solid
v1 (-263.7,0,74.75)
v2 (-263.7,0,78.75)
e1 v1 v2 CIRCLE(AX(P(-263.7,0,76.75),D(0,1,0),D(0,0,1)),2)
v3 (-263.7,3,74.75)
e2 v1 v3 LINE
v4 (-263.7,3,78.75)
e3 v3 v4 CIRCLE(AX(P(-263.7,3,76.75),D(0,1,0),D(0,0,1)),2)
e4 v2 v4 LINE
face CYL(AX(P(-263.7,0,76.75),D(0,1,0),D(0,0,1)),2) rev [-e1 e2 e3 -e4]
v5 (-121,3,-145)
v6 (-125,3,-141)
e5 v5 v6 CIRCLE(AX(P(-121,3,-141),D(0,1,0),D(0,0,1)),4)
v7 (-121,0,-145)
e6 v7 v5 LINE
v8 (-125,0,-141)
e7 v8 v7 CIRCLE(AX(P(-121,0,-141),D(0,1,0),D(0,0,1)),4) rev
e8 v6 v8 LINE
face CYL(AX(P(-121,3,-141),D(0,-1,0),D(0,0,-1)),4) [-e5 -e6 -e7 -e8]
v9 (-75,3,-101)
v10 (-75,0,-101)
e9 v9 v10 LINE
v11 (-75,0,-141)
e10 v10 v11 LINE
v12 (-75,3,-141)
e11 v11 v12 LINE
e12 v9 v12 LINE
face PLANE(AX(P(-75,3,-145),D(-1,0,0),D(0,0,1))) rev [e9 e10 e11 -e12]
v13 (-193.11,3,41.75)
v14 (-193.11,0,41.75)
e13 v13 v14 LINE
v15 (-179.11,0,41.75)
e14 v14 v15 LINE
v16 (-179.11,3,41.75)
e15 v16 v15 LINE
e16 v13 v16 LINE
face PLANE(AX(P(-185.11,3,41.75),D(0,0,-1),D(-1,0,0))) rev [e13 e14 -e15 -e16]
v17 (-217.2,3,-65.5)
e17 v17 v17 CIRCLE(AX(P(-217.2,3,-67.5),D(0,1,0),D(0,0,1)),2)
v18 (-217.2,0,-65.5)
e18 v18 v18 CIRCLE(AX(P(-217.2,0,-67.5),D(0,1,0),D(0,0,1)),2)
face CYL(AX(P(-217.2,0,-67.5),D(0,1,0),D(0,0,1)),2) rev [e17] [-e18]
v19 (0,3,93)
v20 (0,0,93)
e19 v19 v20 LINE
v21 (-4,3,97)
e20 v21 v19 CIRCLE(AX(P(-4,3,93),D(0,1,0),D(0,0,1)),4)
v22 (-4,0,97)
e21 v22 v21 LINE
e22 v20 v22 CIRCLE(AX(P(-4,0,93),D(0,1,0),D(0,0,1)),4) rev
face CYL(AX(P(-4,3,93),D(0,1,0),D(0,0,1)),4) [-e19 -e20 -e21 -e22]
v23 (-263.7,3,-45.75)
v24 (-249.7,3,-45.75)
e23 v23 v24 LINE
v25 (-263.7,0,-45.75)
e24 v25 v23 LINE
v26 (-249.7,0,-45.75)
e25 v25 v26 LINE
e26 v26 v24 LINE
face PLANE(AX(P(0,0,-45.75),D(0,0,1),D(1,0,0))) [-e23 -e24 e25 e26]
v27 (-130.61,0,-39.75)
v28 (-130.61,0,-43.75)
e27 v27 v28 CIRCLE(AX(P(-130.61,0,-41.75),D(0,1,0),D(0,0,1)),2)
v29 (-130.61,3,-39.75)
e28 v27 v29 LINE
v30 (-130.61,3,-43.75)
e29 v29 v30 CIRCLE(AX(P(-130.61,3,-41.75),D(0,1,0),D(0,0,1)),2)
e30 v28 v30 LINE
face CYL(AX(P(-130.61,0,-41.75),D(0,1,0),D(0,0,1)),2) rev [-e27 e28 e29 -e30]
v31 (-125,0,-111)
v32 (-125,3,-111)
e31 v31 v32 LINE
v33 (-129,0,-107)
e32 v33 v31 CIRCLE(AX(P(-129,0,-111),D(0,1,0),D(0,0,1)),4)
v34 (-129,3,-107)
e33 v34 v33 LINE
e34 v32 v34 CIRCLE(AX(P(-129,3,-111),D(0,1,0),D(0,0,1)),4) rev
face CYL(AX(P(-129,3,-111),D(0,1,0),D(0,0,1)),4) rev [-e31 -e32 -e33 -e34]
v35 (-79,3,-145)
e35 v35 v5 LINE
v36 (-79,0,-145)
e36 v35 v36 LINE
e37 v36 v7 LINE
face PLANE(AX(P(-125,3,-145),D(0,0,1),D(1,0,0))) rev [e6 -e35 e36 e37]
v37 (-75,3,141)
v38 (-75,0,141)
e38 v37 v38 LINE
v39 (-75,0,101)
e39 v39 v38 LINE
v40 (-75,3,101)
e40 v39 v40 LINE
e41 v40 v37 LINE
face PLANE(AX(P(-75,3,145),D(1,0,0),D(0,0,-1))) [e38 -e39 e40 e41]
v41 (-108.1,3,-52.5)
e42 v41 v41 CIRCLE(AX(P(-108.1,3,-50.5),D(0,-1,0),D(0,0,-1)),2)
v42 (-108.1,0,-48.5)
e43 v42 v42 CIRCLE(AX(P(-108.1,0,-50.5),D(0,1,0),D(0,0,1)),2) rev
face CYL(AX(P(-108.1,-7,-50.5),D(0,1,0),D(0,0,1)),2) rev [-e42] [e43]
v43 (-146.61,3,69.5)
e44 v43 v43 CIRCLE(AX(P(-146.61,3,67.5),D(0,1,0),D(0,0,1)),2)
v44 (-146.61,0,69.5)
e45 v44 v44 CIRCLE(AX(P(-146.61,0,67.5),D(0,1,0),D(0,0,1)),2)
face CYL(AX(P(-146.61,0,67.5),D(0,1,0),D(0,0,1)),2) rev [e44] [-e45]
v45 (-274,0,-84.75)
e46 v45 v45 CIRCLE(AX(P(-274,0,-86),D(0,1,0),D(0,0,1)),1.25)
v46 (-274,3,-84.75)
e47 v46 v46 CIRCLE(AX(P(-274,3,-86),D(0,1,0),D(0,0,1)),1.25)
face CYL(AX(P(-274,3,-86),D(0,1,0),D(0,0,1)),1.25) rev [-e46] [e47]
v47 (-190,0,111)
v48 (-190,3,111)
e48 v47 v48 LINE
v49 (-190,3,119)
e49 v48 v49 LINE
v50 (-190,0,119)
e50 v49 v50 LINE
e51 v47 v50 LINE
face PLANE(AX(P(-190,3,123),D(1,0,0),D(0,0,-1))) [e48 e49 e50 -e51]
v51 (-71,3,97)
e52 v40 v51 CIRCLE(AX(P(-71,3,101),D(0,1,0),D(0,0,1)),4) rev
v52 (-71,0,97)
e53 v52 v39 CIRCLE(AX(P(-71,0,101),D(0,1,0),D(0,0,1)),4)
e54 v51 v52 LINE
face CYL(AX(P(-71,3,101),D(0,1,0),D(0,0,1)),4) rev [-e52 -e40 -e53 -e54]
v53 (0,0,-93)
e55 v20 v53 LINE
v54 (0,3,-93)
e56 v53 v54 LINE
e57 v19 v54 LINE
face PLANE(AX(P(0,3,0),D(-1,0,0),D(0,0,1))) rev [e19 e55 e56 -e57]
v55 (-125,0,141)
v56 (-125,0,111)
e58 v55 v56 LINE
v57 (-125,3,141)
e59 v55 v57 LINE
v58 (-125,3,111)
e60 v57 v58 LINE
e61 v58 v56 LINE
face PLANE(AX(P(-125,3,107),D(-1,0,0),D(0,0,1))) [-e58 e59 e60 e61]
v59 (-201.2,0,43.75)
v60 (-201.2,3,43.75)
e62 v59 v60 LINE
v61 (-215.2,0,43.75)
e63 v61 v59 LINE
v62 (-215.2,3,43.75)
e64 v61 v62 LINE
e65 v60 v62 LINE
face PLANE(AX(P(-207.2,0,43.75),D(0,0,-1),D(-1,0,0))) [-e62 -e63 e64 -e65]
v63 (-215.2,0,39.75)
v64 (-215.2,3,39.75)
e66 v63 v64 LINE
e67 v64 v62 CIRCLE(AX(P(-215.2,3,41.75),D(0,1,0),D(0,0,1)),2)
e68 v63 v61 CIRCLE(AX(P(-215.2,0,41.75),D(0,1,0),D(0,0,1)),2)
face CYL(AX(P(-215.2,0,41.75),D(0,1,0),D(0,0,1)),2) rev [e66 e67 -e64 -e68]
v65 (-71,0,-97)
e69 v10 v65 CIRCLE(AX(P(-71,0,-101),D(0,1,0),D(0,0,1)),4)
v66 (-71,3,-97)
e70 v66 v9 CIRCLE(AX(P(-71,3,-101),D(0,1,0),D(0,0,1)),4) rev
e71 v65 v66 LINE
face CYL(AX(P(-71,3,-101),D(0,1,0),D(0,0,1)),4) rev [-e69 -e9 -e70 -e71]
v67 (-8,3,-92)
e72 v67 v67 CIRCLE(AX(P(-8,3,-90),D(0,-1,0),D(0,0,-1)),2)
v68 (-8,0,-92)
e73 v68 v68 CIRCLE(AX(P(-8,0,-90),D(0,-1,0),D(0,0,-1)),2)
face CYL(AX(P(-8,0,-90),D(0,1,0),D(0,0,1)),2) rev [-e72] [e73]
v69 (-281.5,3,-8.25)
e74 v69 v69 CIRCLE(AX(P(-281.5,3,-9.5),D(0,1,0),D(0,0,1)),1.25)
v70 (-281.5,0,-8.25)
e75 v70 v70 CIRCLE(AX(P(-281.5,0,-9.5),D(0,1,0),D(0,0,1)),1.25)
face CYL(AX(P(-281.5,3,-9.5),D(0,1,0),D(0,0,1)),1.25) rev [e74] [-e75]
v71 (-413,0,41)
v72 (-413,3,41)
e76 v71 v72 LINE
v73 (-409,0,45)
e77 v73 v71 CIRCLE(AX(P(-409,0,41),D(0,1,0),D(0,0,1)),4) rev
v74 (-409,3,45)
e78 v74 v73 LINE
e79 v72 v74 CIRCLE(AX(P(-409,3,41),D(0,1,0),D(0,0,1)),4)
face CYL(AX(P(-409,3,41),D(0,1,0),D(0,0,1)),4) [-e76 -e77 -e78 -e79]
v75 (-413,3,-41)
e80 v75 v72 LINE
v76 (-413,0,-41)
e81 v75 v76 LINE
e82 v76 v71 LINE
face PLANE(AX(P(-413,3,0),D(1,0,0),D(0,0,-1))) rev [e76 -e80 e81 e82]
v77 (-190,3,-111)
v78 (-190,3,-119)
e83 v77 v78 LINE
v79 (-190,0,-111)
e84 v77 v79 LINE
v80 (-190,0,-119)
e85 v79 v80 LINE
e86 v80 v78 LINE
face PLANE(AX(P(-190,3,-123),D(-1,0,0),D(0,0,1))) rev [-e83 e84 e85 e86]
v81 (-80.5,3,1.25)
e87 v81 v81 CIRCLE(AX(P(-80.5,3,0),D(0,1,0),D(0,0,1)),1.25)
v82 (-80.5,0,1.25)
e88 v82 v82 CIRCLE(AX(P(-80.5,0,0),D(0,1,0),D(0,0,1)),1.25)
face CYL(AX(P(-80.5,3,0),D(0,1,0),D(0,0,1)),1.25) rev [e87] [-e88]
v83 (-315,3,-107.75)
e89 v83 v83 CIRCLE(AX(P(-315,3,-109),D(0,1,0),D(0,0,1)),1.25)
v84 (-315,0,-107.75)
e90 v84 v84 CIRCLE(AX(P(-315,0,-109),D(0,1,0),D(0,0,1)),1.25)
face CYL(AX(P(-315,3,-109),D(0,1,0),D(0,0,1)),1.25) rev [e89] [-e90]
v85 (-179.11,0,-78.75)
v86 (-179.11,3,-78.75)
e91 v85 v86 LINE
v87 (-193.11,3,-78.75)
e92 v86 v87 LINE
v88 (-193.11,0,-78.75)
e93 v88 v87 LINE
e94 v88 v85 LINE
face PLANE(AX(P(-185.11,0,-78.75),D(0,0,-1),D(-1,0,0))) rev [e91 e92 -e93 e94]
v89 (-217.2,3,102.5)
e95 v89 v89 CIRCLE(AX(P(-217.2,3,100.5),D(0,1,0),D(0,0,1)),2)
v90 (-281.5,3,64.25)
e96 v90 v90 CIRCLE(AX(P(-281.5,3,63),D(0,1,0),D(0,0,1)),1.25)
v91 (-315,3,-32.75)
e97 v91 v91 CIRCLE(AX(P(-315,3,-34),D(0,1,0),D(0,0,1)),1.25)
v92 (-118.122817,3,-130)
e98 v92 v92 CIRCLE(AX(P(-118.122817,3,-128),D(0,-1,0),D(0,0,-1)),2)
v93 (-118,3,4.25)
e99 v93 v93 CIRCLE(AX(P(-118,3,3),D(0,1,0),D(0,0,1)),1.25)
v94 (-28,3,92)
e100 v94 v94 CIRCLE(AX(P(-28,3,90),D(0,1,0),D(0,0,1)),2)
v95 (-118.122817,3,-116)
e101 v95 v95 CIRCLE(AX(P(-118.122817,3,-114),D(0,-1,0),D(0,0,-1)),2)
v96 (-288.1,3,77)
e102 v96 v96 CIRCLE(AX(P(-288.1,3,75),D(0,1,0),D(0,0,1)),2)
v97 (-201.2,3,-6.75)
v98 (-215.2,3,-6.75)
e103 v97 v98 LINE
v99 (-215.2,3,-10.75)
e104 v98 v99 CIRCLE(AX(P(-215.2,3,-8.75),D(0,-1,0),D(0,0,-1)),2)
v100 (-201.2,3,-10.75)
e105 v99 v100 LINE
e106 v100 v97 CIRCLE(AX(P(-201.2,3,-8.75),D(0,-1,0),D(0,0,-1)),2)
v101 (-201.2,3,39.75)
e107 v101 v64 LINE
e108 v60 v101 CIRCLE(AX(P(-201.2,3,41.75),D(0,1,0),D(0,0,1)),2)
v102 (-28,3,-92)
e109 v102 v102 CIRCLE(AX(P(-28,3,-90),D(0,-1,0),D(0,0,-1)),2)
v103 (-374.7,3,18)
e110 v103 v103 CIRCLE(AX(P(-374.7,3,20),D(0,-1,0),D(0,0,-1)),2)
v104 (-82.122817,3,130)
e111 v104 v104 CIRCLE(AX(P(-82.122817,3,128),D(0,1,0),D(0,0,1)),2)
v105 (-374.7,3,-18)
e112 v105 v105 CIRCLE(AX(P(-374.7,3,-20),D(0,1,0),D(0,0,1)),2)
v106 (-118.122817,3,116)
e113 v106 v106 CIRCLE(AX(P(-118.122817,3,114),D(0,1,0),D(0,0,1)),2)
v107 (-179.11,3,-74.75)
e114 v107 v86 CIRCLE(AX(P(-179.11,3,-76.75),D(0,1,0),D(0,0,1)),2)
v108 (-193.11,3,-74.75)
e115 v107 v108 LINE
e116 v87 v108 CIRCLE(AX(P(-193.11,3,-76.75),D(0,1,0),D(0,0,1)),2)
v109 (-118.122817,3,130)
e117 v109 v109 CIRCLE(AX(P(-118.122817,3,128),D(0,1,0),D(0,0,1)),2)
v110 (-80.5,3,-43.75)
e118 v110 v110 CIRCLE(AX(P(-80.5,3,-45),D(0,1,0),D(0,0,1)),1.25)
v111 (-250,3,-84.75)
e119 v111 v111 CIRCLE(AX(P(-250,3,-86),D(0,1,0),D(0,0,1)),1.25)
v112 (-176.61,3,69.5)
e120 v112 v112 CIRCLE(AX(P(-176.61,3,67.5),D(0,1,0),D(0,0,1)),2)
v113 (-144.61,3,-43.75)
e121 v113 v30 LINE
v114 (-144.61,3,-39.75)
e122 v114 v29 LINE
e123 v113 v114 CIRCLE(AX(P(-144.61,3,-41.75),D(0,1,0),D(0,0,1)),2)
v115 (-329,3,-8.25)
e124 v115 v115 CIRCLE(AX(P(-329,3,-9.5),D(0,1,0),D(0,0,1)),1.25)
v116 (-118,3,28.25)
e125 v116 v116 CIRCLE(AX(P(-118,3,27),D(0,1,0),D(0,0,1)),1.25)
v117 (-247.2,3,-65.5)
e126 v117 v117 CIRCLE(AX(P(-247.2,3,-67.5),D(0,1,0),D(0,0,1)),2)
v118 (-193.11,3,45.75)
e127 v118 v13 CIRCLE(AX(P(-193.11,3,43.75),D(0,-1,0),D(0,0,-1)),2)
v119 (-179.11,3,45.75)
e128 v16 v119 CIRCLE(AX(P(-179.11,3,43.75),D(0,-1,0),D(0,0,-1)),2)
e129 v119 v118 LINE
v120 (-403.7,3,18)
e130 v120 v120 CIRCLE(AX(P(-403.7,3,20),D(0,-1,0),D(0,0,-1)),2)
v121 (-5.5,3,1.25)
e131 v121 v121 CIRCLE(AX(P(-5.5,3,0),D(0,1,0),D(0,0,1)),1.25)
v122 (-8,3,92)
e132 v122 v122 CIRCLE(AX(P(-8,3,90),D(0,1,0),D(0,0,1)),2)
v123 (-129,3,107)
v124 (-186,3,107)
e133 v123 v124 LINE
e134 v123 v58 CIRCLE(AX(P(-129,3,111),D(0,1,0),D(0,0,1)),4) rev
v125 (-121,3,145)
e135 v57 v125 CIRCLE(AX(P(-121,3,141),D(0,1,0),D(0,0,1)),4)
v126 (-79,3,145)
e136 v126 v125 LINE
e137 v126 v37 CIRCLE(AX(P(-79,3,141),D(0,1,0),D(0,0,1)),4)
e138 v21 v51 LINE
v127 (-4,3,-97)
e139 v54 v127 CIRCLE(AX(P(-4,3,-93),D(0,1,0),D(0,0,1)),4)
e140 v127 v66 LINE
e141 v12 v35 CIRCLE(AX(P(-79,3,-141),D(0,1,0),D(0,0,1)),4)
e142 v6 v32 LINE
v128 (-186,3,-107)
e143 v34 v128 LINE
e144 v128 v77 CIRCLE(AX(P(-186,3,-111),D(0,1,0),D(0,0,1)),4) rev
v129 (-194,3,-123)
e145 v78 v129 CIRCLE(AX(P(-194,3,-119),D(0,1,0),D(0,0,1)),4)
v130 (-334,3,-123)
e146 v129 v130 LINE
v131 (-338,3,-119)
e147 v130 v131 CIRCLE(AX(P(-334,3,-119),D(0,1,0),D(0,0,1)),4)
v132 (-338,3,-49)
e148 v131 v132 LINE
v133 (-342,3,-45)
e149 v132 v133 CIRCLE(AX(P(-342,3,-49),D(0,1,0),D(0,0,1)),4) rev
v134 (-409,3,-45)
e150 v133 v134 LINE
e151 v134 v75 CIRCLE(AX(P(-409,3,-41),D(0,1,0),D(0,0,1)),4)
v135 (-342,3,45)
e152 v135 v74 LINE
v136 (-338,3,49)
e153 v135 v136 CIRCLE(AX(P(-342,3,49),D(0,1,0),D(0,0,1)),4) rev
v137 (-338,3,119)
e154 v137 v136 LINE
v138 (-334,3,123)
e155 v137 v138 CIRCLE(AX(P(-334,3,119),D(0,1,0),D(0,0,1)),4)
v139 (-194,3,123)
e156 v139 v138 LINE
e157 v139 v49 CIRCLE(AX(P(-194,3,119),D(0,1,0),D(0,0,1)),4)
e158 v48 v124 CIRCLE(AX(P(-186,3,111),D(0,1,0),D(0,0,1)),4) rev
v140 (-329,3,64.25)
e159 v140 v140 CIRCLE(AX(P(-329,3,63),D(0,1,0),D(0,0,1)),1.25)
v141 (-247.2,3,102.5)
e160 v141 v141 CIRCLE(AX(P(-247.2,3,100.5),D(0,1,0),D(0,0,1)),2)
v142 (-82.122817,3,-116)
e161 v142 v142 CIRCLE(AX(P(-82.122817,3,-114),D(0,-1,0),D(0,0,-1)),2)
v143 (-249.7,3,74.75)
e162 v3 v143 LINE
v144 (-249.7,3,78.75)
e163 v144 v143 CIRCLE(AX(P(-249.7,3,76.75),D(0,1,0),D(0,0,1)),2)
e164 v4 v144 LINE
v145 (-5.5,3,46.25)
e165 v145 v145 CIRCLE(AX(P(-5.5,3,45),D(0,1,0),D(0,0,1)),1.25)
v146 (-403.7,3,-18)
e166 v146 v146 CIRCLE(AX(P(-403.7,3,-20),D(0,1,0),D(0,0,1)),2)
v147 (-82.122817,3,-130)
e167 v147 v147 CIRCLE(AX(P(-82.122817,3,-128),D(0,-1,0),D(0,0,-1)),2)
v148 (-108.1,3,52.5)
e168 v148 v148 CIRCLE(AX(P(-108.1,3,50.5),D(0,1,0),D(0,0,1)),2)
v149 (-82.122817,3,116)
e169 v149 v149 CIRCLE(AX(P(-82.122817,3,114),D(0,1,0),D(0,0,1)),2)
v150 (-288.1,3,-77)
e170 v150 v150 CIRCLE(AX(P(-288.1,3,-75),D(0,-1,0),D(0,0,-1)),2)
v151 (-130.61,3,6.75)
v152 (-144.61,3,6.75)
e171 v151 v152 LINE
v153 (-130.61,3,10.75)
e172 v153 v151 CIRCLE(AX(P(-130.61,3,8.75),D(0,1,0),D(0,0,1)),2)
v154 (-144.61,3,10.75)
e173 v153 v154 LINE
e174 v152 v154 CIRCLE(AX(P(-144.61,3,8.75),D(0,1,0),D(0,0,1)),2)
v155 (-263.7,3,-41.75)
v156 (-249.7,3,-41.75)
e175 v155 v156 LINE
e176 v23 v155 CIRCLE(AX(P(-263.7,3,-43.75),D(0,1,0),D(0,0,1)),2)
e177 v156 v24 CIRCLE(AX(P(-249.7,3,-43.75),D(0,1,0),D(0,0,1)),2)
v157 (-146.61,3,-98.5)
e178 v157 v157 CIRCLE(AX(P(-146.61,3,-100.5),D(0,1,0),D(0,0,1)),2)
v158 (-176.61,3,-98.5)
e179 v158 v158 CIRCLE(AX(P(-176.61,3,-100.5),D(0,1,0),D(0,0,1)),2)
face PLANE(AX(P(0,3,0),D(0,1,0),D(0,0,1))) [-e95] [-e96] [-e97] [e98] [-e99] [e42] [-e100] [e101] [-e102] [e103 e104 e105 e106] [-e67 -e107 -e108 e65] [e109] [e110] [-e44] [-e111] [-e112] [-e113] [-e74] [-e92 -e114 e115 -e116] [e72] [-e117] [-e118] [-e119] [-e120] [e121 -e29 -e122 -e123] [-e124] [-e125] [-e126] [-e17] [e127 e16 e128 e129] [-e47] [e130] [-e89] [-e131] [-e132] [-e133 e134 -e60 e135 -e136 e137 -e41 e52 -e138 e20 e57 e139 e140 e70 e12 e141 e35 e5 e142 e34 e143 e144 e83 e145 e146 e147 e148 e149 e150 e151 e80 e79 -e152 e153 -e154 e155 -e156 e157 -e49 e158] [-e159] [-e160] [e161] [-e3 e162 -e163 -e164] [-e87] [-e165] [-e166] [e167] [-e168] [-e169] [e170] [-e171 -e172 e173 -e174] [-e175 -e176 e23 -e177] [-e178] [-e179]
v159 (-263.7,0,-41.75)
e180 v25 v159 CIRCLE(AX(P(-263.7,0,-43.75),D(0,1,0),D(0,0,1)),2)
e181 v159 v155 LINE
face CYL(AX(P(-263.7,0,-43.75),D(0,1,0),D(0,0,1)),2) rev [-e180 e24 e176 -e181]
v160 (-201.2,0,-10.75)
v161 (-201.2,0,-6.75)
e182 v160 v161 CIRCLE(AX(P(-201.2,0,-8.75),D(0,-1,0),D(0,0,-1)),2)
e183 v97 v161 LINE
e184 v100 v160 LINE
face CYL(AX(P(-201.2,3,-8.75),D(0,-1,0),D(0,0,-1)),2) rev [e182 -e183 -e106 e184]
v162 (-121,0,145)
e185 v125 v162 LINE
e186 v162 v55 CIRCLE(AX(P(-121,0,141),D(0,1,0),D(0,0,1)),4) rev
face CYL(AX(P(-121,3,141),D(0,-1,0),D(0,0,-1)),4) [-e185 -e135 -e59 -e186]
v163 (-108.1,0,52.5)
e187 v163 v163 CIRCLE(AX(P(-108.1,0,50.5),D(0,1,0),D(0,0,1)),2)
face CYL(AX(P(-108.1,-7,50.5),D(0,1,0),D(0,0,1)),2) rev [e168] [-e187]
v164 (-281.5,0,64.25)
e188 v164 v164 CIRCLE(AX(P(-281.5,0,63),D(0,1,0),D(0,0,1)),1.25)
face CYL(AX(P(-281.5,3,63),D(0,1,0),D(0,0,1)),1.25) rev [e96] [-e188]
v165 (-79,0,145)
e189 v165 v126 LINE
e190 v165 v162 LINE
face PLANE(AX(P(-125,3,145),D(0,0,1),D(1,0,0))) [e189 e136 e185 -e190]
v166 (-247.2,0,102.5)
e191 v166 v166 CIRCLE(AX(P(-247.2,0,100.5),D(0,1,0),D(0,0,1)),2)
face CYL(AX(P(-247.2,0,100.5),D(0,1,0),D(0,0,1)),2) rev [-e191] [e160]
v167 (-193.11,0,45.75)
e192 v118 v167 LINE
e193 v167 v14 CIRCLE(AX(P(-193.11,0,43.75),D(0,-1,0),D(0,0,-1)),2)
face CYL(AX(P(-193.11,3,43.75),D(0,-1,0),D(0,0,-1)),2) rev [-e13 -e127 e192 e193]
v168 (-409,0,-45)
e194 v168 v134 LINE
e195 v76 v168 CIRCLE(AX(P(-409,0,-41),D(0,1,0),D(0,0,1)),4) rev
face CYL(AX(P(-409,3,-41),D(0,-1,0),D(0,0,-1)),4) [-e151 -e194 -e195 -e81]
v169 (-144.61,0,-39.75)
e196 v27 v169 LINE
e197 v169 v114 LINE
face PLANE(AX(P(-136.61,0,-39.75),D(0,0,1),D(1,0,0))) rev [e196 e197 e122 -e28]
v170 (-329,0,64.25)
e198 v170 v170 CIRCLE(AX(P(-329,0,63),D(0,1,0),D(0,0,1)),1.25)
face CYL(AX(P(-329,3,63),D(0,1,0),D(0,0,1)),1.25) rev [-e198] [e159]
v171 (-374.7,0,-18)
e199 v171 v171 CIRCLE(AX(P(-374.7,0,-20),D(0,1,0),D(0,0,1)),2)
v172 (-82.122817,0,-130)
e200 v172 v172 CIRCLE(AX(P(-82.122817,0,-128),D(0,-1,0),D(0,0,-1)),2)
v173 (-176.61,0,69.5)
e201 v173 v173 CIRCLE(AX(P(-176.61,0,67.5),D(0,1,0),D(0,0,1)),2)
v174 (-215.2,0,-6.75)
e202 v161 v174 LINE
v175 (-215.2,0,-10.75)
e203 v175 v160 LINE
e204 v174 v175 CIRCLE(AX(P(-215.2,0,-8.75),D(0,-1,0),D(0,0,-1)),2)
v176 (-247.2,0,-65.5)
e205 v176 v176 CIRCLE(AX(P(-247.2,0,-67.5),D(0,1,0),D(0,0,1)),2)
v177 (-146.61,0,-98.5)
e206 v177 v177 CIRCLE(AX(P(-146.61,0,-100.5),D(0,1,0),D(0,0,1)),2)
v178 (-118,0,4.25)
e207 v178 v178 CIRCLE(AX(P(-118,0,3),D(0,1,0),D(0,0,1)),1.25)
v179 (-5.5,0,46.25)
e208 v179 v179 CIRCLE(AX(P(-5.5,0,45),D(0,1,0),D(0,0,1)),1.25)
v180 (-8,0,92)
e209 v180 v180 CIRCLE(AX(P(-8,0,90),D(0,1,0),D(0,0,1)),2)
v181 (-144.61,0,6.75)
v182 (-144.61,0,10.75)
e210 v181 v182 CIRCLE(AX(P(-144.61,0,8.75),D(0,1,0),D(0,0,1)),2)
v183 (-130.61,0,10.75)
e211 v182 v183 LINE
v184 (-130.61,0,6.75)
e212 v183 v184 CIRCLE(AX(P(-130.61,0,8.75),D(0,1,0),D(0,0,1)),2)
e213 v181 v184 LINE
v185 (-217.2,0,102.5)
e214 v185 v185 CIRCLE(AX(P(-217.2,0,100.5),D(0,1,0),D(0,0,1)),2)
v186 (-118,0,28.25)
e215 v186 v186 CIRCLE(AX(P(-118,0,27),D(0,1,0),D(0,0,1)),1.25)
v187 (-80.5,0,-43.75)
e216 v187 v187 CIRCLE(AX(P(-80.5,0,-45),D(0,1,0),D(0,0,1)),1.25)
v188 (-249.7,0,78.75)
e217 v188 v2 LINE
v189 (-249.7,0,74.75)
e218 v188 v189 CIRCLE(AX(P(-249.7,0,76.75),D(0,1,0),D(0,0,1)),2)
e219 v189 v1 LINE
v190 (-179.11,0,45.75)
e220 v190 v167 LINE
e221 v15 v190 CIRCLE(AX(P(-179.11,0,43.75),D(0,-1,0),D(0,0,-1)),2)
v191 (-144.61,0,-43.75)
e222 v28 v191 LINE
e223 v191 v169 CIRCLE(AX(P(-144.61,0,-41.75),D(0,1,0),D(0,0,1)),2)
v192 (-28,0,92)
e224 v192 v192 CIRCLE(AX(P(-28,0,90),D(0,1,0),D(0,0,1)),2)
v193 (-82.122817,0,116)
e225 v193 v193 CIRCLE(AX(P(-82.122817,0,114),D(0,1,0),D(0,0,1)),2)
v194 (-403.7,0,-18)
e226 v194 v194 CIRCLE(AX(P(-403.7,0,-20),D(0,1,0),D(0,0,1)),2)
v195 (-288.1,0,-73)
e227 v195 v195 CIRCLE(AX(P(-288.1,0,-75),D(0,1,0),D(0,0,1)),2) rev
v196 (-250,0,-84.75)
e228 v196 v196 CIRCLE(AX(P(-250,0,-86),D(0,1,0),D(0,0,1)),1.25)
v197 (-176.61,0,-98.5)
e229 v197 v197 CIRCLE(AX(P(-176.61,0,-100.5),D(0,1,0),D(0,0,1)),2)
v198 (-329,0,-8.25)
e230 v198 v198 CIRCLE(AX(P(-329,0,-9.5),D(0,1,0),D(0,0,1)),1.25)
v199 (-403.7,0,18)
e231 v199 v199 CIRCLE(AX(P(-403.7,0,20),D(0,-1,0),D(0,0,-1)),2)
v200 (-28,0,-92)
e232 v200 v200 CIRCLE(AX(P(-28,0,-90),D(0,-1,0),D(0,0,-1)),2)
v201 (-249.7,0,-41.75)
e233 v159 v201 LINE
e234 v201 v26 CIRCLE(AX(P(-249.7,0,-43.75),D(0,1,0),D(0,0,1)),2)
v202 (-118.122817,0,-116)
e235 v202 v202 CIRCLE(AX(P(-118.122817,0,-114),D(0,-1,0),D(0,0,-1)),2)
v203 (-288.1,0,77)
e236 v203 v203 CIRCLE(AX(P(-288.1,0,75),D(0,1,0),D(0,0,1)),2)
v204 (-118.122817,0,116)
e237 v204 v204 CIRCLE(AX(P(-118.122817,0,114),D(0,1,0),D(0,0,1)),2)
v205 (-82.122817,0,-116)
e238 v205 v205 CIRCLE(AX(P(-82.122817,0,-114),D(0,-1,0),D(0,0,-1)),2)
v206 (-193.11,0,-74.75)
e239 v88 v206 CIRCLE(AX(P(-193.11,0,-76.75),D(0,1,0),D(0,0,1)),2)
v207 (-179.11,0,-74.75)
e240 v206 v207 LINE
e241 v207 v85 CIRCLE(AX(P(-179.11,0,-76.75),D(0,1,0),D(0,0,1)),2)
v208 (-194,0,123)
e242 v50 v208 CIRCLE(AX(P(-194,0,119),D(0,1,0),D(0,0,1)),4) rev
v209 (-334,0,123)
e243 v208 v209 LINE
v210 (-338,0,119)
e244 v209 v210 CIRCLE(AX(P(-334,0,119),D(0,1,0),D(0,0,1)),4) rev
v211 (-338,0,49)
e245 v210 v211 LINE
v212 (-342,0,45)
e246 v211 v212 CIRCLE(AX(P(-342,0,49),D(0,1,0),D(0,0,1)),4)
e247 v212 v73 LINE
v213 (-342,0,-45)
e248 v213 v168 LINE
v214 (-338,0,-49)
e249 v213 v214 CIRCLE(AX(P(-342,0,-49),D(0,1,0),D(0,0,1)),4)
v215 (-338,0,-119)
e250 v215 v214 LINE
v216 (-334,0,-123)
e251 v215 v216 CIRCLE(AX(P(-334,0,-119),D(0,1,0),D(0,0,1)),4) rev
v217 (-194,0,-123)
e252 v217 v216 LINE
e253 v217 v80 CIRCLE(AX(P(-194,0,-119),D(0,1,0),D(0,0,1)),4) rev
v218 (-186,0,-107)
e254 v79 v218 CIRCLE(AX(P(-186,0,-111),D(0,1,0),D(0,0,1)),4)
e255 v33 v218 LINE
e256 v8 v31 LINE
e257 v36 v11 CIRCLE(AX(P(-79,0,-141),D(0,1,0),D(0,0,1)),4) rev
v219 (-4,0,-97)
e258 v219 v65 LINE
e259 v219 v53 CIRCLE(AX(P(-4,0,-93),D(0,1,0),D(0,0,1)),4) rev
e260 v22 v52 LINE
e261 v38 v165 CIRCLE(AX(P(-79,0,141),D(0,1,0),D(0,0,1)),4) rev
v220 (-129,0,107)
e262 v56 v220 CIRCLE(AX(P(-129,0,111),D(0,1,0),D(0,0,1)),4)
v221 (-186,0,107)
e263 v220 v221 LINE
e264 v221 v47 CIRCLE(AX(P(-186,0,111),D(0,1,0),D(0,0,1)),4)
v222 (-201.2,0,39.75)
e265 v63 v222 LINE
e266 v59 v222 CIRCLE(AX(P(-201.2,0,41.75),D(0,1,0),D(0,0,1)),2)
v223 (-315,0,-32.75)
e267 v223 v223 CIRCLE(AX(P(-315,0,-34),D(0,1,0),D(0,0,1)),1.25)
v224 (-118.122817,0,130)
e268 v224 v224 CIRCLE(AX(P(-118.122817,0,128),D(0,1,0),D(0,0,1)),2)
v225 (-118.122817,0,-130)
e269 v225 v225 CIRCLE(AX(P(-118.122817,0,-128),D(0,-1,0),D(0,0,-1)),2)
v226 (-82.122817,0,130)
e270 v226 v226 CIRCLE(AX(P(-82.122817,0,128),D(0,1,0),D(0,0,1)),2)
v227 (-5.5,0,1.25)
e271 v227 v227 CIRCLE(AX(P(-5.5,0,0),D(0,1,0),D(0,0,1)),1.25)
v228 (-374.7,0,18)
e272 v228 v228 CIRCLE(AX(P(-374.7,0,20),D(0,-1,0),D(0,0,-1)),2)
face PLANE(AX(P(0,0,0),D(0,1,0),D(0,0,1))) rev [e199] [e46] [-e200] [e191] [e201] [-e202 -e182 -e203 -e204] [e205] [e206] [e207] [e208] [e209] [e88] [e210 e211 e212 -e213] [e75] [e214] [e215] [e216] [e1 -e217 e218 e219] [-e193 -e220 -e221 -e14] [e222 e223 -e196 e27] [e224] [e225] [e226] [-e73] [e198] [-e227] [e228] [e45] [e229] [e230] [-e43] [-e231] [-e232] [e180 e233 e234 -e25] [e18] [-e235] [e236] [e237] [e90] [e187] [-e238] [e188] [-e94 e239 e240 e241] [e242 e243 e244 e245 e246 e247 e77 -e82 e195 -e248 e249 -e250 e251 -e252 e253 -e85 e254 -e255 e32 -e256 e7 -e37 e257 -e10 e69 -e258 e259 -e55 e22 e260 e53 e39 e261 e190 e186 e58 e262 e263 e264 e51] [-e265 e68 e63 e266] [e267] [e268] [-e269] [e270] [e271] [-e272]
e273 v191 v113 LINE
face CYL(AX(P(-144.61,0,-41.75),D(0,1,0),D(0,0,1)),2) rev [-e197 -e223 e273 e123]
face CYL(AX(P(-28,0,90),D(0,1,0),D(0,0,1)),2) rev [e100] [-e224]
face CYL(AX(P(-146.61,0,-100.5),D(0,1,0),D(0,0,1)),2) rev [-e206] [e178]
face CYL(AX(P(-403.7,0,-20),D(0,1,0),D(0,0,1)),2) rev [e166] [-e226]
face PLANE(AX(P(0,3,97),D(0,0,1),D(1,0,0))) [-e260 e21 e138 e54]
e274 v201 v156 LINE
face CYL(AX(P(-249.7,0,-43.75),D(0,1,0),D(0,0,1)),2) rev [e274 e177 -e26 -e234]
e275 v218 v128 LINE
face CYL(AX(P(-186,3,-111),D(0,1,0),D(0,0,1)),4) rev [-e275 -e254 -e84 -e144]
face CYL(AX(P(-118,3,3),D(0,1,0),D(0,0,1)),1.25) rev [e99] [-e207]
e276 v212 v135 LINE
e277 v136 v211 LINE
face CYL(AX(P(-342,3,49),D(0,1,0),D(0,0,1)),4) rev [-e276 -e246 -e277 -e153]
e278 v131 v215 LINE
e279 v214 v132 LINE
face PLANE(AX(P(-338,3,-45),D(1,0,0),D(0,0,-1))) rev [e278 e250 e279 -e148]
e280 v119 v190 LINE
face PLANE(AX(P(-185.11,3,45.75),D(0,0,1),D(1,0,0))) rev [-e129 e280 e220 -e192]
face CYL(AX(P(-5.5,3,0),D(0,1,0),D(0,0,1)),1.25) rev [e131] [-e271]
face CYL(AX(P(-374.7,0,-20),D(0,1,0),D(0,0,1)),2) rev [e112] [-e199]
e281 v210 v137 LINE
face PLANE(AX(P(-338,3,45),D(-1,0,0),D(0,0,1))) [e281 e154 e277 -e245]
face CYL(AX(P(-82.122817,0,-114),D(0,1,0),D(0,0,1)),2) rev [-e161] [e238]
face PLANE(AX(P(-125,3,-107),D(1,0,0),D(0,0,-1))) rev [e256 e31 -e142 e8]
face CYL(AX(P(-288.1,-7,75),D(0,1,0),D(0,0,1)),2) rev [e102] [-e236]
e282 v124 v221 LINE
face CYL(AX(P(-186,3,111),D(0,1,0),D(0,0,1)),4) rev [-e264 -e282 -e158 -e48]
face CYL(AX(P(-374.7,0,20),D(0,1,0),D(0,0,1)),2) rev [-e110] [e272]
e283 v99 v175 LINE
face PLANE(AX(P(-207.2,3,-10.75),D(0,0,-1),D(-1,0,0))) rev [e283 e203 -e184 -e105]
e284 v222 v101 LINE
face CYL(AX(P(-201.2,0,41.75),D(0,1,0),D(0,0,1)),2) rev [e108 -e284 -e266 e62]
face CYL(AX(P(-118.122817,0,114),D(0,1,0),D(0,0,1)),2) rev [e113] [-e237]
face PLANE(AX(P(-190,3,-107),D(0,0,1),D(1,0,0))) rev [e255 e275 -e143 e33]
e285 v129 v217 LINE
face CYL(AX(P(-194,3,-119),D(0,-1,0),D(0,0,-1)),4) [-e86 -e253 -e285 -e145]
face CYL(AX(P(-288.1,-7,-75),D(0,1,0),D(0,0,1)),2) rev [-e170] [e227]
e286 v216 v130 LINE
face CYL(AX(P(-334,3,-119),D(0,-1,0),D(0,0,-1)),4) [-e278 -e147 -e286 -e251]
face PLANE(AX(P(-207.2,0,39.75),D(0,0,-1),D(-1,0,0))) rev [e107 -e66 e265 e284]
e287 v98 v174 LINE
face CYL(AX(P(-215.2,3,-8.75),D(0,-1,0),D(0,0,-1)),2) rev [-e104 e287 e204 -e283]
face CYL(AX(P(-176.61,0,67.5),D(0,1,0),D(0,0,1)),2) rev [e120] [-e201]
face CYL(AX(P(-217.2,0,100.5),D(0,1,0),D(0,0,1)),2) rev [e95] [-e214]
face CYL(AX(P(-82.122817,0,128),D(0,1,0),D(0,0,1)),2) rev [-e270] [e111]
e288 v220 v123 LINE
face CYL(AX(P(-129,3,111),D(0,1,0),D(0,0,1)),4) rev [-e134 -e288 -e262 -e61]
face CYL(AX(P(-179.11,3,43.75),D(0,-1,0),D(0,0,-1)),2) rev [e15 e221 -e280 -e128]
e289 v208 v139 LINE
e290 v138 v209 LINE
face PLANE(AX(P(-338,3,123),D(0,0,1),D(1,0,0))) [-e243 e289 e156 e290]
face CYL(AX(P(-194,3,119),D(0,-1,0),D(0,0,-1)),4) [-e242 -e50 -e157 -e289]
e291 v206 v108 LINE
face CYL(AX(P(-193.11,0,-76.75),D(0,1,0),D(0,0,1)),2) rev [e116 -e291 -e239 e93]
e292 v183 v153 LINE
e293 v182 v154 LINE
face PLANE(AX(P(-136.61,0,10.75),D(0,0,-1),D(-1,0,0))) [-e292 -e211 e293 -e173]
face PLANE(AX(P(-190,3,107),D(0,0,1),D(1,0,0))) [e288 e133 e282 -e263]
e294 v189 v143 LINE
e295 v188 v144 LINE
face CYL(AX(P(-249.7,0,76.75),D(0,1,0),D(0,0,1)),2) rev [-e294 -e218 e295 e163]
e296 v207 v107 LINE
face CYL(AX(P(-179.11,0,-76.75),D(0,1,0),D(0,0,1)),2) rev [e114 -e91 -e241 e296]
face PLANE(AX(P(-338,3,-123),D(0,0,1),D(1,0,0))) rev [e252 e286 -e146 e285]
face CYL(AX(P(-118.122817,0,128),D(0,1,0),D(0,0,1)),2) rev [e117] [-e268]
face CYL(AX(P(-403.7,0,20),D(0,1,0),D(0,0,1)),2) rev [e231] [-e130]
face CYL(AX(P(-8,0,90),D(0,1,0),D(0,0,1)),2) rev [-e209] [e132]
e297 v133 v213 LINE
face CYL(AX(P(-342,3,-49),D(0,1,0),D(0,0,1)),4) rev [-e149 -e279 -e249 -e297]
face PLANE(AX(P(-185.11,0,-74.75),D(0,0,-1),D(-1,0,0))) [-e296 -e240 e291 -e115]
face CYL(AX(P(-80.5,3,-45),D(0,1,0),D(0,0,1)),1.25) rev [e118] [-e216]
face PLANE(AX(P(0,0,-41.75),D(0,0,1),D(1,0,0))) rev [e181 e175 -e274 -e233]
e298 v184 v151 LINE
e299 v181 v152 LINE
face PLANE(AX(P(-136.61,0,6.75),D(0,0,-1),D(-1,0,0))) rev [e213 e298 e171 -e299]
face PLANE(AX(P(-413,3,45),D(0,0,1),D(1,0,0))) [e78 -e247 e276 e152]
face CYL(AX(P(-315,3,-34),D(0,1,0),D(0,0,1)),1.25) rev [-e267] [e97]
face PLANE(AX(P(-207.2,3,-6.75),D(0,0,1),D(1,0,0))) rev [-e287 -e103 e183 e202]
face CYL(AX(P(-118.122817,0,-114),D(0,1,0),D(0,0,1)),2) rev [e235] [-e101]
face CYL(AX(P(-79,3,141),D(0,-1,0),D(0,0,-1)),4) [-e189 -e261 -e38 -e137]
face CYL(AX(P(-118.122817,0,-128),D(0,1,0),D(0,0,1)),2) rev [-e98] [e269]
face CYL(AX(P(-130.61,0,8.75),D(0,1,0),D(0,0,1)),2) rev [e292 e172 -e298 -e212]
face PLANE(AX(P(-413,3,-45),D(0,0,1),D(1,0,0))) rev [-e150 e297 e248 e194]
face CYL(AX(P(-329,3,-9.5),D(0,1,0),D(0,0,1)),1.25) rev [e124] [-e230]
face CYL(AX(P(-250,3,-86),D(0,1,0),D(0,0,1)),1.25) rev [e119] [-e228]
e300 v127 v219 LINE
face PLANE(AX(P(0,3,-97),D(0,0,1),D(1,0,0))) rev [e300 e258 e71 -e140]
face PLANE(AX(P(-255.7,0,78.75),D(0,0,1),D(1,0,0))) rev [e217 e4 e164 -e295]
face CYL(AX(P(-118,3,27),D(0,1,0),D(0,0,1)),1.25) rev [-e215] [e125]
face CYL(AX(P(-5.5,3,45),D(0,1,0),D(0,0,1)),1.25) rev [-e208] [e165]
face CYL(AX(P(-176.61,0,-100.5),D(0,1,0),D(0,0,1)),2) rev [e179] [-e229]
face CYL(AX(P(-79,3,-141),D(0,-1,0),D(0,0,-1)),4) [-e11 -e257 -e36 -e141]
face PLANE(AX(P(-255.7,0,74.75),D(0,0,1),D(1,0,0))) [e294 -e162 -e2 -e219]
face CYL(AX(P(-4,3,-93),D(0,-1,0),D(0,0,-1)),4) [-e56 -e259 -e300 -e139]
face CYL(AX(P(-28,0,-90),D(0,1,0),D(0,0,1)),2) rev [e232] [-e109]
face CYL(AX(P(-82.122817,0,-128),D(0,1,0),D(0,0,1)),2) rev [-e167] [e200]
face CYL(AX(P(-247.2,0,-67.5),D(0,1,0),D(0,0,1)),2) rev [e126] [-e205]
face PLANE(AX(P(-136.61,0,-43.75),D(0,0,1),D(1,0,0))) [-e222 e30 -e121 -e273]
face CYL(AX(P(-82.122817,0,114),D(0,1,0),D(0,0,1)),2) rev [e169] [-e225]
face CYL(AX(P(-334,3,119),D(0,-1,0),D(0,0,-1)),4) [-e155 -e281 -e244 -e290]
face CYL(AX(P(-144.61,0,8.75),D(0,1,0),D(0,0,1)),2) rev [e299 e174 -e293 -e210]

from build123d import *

# Parameters (mm, degrees)
SALIENTE_EXTRUIR1_DEPTH       = 3
REDONDEO1_R                   = 4
CROQUIS4_R                    = 2
CORTAR_EXTRUIR1_DEPTH         = 10
CROQUIS5_R                    = 2
CORTAR_EXTRUIR2_DEPTH         = 10
TALADRO_ROSCADO_M31_D         = 2.5
TALADRO_ROSCADO_M31_DEPTH     = 8.5
TALADRO_ROSCADO_M31_TIP       = 0.751075774
CROQUIS13_R                   = 2
CORTAR_EXTRUIR6_DEPTH         = 438.724799389
CROQUIS14_R                   = 2
CORTAR_EXTRUIR7_DEPTH         = 438.724799389
CORTAR_EXTRUIR9_DEPTH         = 438.724799389
TALADRO_ROSCADO_M32_D         = 2.5
TALADRO_ROSCADO_M32_DEPTH     = 8.5
TALADRO_ROSCADO_M32_TIP       = 0.751075774
TALADRO_ROSCADO_M33_OUTLINE_R = 1.25
TALADRO_ROSCADO_M33_DEPTH     = 3
CROQUIS22_R                   = 2
CORTAR_EXTRUIR10_DEPTH        = 438.724799389
CROQUIS23_R                   = 2
CORTAR_EXTRUIR11_DEPTH        = 438.724799389
TALADRO_ROSCADO_M34_OUTLINE_R = 1.25
TALADRO_ROSCADO_M34_DEPTH     = 3
CROQUIS26_R                   = 2
CORTAR_EXTRUIR12_DEPTH        = 438.724799389
TALADRO_ROSCADO_M35_OUTLINE_R = 1.25
TALADRO_ROSCADO_M35_DEPTH     = 3
CROQUIS31_R                   = 2
CORTAR_EXTRUIR13_DEPTH        = 438.724799389
CORTAR_EXTRUIR14_DEPTH        = 438.724799389


# Read off the part's stored shape, not the designer's step: Taladro roscado M33, Taladro roscado M34, Taladro roscado M35
with BuildPart() as part:
    # Croquis1 → Saliente-Extruir1 (new body)
    with BuildSketch(Plane(origin=(0, 0, 0), x_dir=(1, 0, 0), z_dir=(0, 1, 0))):
        Polygon((0, 0), (-413, 0), (-413, 45), (-338, 45), (-338, 123), (-190, 123), (-190, 107), (-125, 107), (-125, 145), (-75, 145), (-75, 97), (0, 97), align=None)
    saliente_extruir1 = extrude(amount=SALIENTE_EXTRUIR1_DEPTH)

    # Simetría1: Saliente-Extruir1 across plane
    add(saliente_extruir1.mirror(Plane(origin=(0, 3, 0), x_dir=(1, 0, 0), z_dir=(0, 0, -1))))

    # Redondeo1
    redondeo1_edges = [part.edges().sort_by_distance(p)[0] for p in [
        (-413, 1.5, -45),
        (-338, 1.5, -45),
        (-338, 1.5, -123),
        (-190, 1.5, -123),
        (-190, 1.5, -107),
        (-125, 1.5, -107),
        (-125, 1.5, -145),
        (-75, 1.5, -145),
        (-75, 1.5, -97),
        (0, 1.5, -97),
        (0, 1.5, 97),
        (-413, 1.5, 45),
        (-338, 1.5, 45),
        (-338, 1.5, 123),
        (-190, 1.5, 123),
        (-190, 1.5, 107),
        (-125, 1.5, 107),
        (-125, 1.5, 145),
        (-75, 1.5, 145),
        (-75, 1.5, 97),
    ]]
    fillet(redondeo1_edges, radius=REDONDEO1_R)

    # Croquis4 → Cortar-Extruir1 (cut)
    with BuildSketch(Plane(origin=(0, 3, 0), x_dir=(1, 0, 0), z_dir=(0, 1, 0))):
        with Locations(Location((-108.1, -50.5, 0), (0, 0, 270))):
            Circle(CROQUIS4_R)
    cortar_extruir1 = extrude(amount=-CORTAR_EXTRUIR1_DEPTH, mode=Mode.SUBTRACT)

    # Simetría2: Cortar-Extruir1 across plane
    add(cortar_extruir1.mirror(Plane.XY), mode=Mode.SUBTRACT)

    # Croquis5 → Cortar-Extruir2 (cut)
    with BuildSketch(Plane(origin=(0, 3, 0), x_dir=(1, 0, 0), z_dir=(0, 1, 0))):
        with Locations(Location((-288.1, -75, 0), (0, 0, 270))):
            Circle(CROQUIS5_R)
    cortar_extruir2 = extrude(amount=-CORTAR_EXTRUIR2_DEPTH, mode=Mode.SUBTRACT)

    # Simetría3: Cortar-Extruir2 across plane
    add(cortar_extruir2.mirror(Plane.XY), mode=Mode.SUBTRACT)

    # Taladro roscado M31
    with Locations(Plane(origin=(0, 3, 0), x_dir=(1, 0, 0), z_dir=(0, 1, 0))):
        with Locations((-329, 9.5), (-281.5, 9.5), (-281.5, -63), (-329, -63)):
            Hole(TALADRO_ROSCADO_M31_D / 2, depth=TALADRO_ROSCADO_M31_DEPTH)
            with Locations((0, 0, -(TALADRO_ROSCADO_M31_DEPTH + TALADRO_ROSCADO_M31_TIP / 2))):  # 118° drill point
                Cone(0, TALADRO_ROSCADO_M31_D / 2, TALADRO_ROSCADO_M31_TIP, mode=Mode.SUBTRACT)

    # Croquis13 → Cortar-Extruir6 (cut, through all)
    with BuildSketch(Plane(origin=(0, 3, 0), x_dir=(1, 0, 0), z_dir=(0, 1, 0))):
        with Locations(Location((-8, -90, 0), (0, 0, 270))):
            Circle(CROQUIS13_R)
    cortar_extruir6 = extrude(amount=-CORTAR_EXTRUIR6_DEPTH, mode=Mode.SUBTRACT)

    # Croquis14 → Cortar-Extruir7 (cut, through all)
    with BuildSketch(Plane(origin=(0, 3, 0), x_dir=(1, 0, 0), z_dir=(0, 1, 0))):
        with Locations(Location((-28, -90, 0), (0, 0, 270))):
            Circle(CROQUIS14_R)
    cortar_extruir7 = extrude(amount=-CORTAR_EXTRUIR7_DEPTH, mode=Mode.SUBTRACT)

    # Croquis16 → Cortar-Extruir9 (cut, through all)
    with BuildSketch(Plane(origin=(0, 3, 0), x_dir=(1, 0, 0), z_dir=(0, 1, 0))):
        with BuildLine():
            Line((-263.7, 41.75), (-249.7, 41.75))
            ThreePointArc((-249.7, 41.75), (-247.7, 43.75), (-249.7, 45.75))
            Line((-249.7, 45.75), (-263.7, 45.75))
            ThreePointArc((-263.7, 45.75), (-265.7, 43.75), (-263.7, 41.75))
        make_face()
        with BuildLine():
            Line((-263.7, -78.75), (-249.7, -78.75))
            ThreePointArc((-249.7, -78.75), (-247.7, -76.75), (-249.7, -74.75))
            Line((-249.7, -74.75), (-263.7, -74.75))
            ThreePointArc((-263.7, -74.75), (-265.7, -76.75), (-263.7, -78.75))
        make_face()
        with BuildLine():
            Line((-215.2, -43.75), (-201.2, -43.75))
            ThreePointArc((-201.2, -43.75), (-199.2, -41.75), (-201.2, -39.75))
            Line((-201.2, -39.75), (-215.2, -39.75))
            ThreePointArc((-215.2, -39.75), (-217.2, -41.75), (-215.2, -43.75))
        make_face()
        with BuildLine():
            Line((-144.61, -10.75), (-130.61, -10.75))
            ThreePointArc((-130.61, -10.75), (-128.61, -8.75), (-130.61, -6.75))
            Line((-130.61, -6.75), (-144.61, -6.75))
            ThreePointArc((-144.61, -6.75), (-146.61, -8.75), (-144.61, -10.75))
        make_face()
        with BuildLine():
            Line((-144.61, 39.75), (-130.61, 39.75))
            ThreePointArc((-130.61, 39.75), (-128.61, 41.75), (-130.61, 43.75))
            Line((-130.61, 43.75), (-144.61, 43.75))
            ThreePointArc((-144.61, 43.75), (-146.61, 41.75), (-144.61, 39.75))
        make_face()
        with BuildLine():
            Line((-193.11, 74.75), (-179.11, 74.75))
            ThreePointArc((-179.11, 74.75), (-177.11, 76.75), (-179.11, 78.75))
            Line((-179.11, 78.75), (-193.11, 78.75))
            ThreePointArc((-193.11, 78.75), (-195.11, 76.75), (-193.11, 74.75))
        make_face()
    extrude(amount=-CORTAR_EXTRUIR9_DEPTH, mode=Mode.SUBTRACT)

    # Taladro roscado M32
    with Locations(Plane(origin=(0, 3, 0), x_dir=(1, 0, 0), z_dir=(0, 1, 0))):
        with Locations((-315, 34), (-315, 109)):
            Hole(TALADRO_ROSCADO_M32_D / 2, depth=TALADRO_ROSCADO_M32_DEPTH)
            with Locations((0, 0, -(TALADRO_ROSCADO_M32_DEPTH + TALADRO_ROSCADO_M32_TIP / 2))):  # 118° drill point
                Cone(0, TALADRO_ROSCADO_M32_D / 2, TALADRO_ROSCADO_M32_TIP, mode=Mode.SUBTRACT)

    # Taladro roscado M33 outline → Taladro roscado M33 (cut)
    with BuildSketch(Plane(origin=(0, 0, 0), x_dir=(1, 0, 0), z_dir=(0, 1, 0))):
        with Locations((-250, 86)):
            Circle(TALADRO_ROSCADO_M33_OUTLINE_R)
        with Locations((-274, 86)):
            Circle(TALADRO_ROSCADO_M33_OUTLINE_R)
    extrude(amount=TALADRO_ROSCADO_M33_DEPTH, mode=Mode.SUBTRACT)

    # Croquis22 → Cortar-Extruir10 (cut, through all)
    with BuildSketch(Plane(origin=(0, 3, 0), x_dir=(1, 0, 0), z_dir=(0, 1, 0))):
        with Locations(Location((-247.2, 67.5, 0), (0, 0, 270))):
            Circle(CROQUIS22_R)
        with Locations(Location((-217.2, 67.5, 0), (0, 0, 270))):
            Circle(CROQUIS22_R)
        with Locations(Location((-217.2, -100.5, 0), (0, 0, 270))):
            Circle(CROQUIS22_R)
        with Locations(Location((-247.2, -100.5, 0), (0, 0, 270))):
            Circle(CROQUIS22_R)
    extrude(amount=-CORTAR_EXTRUIR10_DEPTH, mode=Mode.SUBTRACT)

    # Croquis23 → Cortar-Extruir11 (cut, through all)
    with BuildSketch(Plane(origin=(0, 3, 0), x_dir=(1, 0, 0), z_dir=(0, 1, 0))):
        with Locations(Location((-176.61, 100.5, 0), (0, 0, 270))):
            Circle(CROQUIS23_R)
        with Locations(Location((-146.61, 100.5, 0), (0, 0, 270))):
            Circle(CROQUIS23_R)
        with Locations(Location((-146.61, -67.5, 0), (0, 0, 270))):
            Circle(CROQUIS23_R)
        with Locations(Location((-176.61, -67.5, 0), (0, 0, 270))):
            Circle(CROQUIS23_R)
    extrude(amount=-CORTAR_EXTRUIR11_DEPTH, mode=Mode.SUBTRACT)

    # Taladro roscado M34 outline → Taladro roscado M34 (cut)
    with BuildSketch(Plane(origin=(0, 0, 0), x_dir=(1, 0, 0), z_dir=(0, 1, 0))):
        with Locations((-118, -27)):
            Circle(TALADRO_ROSCADO_M34_OUTLINE_R)
        with Locations((-118, -3)):
            Circle(TALADRO_ROSCADO_M34_OUTLINE_R)
    extrude(amount=TALADRO_ROSCADO_M34_DEPTH, mode=Mode.SUBTRACT)

    # Croquis26 → Cortar-Extruir12 (cut, through all)
    with BuildSketch(Plane(origin=(0, 3, 0), x_dir=(1, 0, 0), z_dir=(0, 1, 0))):
        with Locations(Location((-118.122816505, -114, 0), (0, 0, 270))):
            Circle(CROQUIS26_R)
        with Locations(Location((-82.122816505, -114, 0), (0, 0, 270))):
            Circle(CROQUIS26_R)
        with Locations(Location((-82.122816505, -128, 0), (0, 0, 270))):
            Circle(CROQUIS26_R)
        with Locations(Location((-118.122816505, -128, 0), (0, 0, 270))):
            Circle(CROQUIS26_R)
    cortar_extruir12 = extrude(amount=-CORTAR_EXTRUIR12_DEPTH, mode=Mode.SUBTRACT)

    # Simetría4: Cortar-Extruir12 across plane
    add(cortar_extruir12.mirror(Plane.XY), mode=Mode.SUBTRACT)

    # Taladro roscado M35 outline → Taladro roscado M35 (cut)
    with BuildSketch(Plane(origin=(0, 0, 0), x_dir=(1, 0, 0), z_dir=(0, 1, 0))):
        with Locations((-5.5, 0)):
            Circle(TALADRO_ROSCADO_M35_OUTLINE_R)
        with Locations((-5.5, -45)):
            Circle(TALADRO_ROSCADO_M35_OUTLINE_R)
        with Locations((-80.5, 0)):
            Circle(TALADRO_ROSCADO_M35_OUTLINE_R)
        with Locations((-80.5, 45)):
            Circle(TALADRO_ROSCADO_M35_OUTLINE_R)
    extrude(amount=TALADRO_ROSCADO_M35_DEPTH, mode=Mode.SUBTRACT)

    # Simetría5: Cortar-Extruir6, Cortar-Extruir7 across plane
    add(cortar_extruir6.mirror(Plane.XY), mode=Mode.SUBTRACT)
    add(cortar_extruir7.mirror(Plane.XY), mode=Mode.SUBTRACT)

    # Croquis31 → Cortar-Extruir13 (cut, through all)
    with BuildSketch(Plane(origin=(0, 3, 0), x_dir=(1, 0, 0), z_dir=(0, 1, 0))):
        with Locations(Location((-403.7, 20, 0), (0, 0, 270))):
            Circle(CROQUIS31_R)
        with Locations(Location((-374.7, 20, 0), (0, 0, 270))):
            Circle(CROQUIS31_R)
    cortar_extruir13 = extrude(amount=-CORTAR_EXTRUIR13_DEPTH, mode=Mode.SUBTRACT)

    # Simetría6: Cortar-Extruir13 across plane
    add(cortar_extruir13.mirror(Plane.XY), mode=Mode.SUBTRACT)

    # Croquis32 → Cortar-Extruir14 (cut, through all)
    with BuildSketch(Plane.XZ):
        with BuildLine():
            Line((-185.11, 41.75), (-193.11, 41.75))
            ThreePointArc((-193.11, 41.75), (-195.11, 43.75), (-193.11, 45.75))
            Line((-193.11, 45.75), (-185.11, 45.75))
            Line((-185.11, 45.75), (-179.11, 45.75))
            ThreePointArc((-179.11, 45.75), (-177.11, 43.75), (-179.11, 41.75))
            Line((-179.11, 41.75), (-185.11, 41.75))
        make_face()
        with BuildLine():
            Line((-207.2, -10.75), (-215.2, -10.75))
            ThreePointArc((-215.2, -10.75), (-217.2, -8.75), (-215.2, -6.75))
            Line((-215.2, -6.75), (-207.2, -6.75))
            Line((-207.2, -6.75), (-201.2, -6.75))
            ThreePointArc((-201.2, -6.75), (-199.2, -8.75), (-201.2, -10.75))
            Line((-201.2, -10.75), (-207.2, -10.75))
        make_face()
    extrude(amount=-CORTAR_EXTRUIR14_DEPTH, mode=Mode.SUBTRACT)


solid = part.part
